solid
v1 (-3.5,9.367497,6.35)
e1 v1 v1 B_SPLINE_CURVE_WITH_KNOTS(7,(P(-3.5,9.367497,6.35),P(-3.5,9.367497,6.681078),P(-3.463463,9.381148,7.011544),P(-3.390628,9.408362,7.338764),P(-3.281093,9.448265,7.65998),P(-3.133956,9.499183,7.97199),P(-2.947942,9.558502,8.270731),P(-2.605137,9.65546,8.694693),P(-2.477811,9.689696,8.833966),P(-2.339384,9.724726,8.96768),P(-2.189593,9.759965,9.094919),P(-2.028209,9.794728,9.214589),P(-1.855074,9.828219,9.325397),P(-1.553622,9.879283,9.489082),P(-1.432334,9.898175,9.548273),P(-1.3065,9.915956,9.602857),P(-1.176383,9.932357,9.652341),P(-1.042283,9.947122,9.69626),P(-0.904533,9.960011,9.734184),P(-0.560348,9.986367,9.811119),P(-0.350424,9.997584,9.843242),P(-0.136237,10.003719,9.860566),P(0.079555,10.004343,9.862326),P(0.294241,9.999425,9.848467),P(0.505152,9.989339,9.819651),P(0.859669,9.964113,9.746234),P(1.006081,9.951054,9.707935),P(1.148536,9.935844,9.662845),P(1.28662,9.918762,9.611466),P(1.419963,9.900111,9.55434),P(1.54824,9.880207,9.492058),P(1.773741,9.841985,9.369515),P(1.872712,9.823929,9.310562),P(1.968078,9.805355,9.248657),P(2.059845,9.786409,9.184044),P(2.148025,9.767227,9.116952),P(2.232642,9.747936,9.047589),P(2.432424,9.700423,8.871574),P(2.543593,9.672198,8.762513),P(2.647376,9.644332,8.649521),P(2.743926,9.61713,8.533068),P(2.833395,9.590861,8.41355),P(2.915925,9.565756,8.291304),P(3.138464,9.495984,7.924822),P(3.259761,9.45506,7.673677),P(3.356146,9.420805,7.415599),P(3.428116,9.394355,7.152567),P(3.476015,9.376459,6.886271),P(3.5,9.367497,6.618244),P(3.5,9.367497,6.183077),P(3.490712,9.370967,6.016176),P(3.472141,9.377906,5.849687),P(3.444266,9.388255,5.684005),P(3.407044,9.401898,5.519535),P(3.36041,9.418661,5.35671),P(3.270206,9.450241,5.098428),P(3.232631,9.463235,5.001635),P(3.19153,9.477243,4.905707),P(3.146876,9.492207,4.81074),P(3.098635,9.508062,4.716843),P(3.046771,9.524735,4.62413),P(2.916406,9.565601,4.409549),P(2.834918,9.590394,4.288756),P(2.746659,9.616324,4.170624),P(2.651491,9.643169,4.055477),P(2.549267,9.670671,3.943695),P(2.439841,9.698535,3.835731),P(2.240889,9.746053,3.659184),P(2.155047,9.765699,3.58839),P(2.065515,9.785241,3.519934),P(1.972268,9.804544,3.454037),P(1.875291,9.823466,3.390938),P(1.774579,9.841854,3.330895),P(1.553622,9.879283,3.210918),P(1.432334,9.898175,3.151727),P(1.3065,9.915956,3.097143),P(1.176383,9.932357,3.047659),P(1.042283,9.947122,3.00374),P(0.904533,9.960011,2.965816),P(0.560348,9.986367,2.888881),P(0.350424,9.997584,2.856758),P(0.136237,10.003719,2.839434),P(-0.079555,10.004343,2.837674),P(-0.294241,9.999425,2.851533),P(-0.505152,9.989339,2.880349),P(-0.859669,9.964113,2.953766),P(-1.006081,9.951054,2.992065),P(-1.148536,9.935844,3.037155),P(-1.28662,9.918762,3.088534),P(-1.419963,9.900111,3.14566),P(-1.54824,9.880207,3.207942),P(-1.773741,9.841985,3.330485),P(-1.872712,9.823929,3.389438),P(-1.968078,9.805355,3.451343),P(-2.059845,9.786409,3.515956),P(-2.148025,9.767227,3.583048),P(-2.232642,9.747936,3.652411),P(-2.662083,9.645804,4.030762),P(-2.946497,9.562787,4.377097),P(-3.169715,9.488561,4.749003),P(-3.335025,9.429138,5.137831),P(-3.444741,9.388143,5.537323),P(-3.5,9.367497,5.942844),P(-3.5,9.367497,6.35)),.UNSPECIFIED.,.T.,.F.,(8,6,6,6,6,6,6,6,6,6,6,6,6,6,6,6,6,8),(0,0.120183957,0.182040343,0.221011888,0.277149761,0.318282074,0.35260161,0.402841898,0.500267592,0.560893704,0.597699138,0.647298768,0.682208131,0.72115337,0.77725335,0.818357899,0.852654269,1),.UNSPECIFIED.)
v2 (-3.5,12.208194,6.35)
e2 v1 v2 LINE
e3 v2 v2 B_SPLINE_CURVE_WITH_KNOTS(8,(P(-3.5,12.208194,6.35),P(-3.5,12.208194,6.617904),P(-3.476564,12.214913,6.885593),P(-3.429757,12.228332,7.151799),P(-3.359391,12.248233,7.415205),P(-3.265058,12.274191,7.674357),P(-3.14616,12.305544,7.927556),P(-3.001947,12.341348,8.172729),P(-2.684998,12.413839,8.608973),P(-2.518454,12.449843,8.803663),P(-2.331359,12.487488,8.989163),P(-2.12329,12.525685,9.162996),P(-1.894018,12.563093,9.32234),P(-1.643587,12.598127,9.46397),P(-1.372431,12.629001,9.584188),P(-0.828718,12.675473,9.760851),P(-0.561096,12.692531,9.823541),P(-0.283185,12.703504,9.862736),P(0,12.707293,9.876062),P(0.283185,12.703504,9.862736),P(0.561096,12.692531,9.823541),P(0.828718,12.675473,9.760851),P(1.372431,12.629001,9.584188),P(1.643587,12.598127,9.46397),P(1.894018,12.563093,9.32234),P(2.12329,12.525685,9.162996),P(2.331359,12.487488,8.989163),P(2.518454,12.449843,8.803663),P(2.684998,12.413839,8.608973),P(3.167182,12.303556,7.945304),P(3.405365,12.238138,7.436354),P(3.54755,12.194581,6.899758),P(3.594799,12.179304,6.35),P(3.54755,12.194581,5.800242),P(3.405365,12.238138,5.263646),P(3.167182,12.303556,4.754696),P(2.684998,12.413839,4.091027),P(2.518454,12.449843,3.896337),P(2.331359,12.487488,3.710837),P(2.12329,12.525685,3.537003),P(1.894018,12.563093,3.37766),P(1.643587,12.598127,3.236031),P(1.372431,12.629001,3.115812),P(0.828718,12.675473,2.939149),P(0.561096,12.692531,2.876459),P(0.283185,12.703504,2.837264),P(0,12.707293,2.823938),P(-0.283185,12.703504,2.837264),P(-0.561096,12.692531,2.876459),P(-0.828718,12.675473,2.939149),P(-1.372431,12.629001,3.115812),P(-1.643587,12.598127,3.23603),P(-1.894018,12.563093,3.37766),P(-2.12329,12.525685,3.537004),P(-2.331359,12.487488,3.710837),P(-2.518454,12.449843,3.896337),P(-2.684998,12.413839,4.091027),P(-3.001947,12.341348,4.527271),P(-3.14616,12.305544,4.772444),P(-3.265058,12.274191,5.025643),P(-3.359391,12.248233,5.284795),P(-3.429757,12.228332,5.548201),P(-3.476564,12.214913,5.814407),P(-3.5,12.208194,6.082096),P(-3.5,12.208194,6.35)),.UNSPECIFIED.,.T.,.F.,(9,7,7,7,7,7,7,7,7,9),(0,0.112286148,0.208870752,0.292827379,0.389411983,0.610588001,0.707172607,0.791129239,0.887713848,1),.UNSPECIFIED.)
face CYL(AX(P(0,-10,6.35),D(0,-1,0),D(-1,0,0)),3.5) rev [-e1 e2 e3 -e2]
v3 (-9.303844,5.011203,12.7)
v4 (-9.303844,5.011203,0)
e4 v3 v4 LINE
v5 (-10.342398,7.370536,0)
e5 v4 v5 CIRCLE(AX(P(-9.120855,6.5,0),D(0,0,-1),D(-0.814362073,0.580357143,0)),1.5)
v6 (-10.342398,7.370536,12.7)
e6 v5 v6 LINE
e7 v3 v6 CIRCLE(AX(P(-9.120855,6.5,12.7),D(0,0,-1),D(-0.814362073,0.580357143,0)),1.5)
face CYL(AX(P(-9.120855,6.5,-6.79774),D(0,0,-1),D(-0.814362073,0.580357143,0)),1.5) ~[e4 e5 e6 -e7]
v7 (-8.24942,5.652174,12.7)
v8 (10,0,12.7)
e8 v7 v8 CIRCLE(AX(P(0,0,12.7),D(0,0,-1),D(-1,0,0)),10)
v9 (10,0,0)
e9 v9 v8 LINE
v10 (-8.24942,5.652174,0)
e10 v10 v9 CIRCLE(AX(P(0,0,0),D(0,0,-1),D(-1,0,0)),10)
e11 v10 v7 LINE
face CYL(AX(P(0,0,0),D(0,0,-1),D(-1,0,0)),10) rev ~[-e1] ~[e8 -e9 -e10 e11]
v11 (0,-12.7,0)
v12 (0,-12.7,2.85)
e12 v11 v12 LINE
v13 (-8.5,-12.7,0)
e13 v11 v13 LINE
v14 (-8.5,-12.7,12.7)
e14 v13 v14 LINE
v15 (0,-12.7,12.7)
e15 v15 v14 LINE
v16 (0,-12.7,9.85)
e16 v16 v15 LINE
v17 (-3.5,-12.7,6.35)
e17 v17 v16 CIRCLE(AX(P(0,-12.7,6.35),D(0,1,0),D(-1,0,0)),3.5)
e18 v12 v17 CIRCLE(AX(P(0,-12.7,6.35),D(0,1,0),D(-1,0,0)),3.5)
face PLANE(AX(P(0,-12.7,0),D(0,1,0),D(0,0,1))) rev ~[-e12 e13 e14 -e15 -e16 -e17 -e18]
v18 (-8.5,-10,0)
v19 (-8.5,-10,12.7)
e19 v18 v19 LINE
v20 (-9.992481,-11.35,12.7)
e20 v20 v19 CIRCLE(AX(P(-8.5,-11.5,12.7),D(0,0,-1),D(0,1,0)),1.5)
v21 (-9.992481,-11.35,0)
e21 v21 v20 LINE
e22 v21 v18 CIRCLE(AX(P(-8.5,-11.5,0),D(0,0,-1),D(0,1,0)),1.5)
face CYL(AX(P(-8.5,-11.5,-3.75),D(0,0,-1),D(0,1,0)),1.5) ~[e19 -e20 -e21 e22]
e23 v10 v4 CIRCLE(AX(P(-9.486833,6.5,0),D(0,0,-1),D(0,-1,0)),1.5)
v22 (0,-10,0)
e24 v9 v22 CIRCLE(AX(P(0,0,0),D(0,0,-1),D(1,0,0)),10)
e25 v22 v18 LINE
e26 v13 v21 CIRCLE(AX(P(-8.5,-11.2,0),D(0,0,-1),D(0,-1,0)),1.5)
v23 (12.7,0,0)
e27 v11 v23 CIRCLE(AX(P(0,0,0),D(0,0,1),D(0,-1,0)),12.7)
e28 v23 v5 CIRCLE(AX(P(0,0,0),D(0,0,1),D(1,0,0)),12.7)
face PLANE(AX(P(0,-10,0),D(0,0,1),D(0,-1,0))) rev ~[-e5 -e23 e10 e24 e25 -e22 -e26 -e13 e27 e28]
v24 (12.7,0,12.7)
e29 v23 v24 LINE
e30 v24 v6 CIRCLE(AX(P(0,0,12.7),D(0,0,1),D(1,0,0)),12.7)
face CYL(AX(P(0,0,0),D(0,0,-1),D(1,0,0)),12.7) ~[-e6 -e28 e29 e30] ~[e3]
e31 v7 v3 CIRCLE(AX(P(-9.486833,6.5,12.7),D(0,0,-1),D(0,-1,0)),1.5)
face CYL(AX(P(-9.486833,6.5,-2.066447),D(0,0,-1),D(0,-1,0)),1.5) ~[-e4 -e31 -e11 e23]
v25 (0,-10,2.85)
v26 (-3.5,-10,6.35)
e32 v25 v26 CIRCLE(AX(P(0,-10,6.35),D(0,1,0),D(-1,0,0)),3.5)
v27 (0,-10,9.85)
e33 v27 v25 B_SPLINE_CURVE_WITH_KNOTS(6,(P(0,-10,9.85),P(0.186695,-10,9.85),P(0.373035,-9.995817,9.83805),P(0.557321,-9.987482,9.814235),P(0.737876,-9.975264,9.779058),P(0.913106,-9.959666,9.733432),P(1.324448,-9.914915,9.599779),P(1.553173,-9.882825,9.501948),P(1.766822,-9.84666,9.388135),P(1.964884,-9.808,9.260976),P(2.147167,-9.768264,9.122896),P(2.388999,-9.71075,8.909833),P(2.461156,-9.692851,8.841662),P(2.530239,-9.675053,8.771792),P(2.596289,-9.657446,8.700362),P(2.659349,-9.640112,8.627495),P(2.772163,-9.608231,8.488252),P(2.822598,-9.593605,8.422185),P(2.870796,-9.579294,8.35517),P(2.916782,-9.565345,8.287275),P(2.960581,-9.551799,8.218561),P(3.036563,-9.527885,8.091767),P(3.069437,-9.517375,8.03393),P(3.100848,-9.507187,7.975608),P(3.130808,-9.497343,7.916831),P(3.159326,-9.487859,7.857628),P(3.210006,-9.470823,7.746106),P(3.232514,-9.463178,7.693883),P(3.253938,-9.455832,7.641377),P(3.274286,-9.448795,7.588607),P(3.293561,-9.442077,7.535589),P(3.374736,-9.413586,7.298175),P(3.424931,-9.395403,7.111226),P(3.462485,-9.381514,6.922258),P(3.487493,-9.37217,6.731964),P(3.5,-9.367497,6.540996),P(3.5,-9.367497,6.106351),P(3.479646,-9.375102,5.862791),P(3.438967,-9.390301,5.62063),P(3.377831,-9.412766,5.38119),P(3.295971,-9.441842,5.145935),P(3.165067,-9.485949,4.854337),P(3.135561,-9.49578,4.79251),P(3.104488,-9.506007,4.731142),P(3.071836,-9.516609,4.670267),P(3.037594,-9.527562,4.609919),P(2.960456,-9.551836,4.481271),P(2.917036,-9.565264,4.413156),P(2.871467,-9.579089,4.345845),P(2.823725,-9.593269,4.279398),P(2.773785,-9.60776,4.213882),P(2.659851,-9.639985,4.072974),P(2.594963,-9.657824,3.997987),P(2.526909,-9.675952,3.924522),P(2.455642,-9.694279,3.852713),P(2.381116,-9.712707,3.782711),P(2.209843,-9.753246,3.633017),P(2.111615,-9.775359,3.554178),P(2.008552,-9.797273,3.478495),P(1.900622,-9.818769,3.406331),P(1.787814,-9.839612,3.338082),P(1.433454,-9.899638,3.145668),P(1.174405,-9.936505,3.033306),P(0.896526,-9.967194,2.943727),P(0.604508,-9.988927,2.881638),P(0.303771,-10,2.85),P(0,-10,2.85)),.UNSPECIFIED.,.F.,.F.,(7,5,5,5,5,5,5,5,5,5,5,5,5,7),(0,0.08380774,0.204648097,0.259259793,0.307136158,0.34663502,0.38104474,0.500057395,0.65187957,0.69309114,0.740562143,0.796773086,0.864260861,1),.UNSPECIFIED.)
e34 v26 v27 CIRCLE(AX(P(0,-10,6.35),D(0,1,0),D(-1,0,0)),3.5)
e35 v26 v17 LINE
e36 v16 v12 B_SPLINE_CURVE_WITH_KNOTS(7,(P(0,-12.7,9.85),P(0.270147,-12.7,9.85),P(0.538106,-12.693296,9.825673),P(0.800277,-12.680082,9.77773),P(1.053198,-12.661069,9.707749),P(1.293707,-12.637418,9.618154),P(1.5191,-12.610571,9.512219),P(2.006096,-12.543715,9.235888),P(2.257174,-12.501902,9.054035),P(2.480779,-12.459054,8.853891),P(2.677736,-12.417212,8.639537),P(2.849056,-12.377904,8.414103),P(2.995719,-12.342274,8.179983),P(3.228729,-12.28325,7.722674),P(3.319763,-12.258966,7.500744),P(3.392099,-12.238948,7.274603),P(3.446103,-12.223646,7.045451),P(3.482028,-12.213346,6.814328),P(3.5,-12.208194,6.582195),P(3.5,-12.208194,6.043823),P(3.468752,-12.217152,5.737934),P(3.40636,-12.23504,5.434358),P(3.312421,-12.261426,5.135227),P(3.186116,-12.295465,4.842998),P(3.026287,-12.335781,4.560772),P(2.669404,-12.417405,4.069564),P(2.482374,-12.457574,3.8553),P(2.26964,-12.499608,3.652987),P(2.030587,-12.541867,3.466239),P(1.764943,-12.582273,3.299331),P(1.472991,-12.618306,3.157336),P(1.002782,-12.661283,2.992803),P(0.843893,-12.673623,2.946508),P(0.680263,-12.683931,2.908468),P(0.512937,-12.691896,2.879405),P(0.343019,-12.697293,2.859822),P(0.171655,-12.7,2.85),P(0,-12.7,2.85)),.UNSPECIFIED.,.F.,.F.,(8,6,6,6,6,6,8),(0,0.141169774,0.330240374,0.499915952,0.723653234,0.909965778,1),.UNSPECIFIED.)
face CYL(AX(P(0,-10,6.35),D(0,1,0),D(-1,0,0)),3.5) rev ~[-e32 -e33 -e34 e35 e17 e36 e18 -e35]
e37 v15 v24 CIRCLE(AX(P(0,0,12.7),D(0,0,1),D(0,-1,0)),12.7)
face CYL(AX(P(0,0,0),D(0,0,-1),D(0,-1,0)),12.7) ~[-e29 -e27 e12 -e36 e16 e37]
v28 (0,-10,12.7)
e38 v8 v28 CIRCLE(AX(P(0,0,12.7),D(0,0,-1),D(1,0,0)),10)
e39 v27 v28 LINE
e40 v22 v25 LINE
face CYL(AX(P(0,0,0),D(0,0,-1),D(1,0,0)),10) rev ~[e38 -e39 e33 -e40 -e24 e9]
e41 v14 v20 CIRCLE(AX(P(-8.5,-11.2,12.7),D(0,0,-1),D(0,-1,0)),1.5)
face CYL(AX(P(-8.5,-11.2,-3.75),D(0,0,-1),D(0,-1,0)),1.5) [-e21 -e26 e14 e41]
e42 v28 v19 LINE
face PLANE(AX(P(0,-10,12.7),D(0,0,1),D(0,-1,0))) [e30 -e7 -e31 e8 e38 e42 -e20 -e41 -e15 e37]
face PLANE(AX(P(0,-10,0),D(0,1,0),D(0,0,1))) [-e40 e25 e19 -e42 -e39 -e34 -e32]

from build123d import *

# Parameters (mm, degrees)
F1_DEPTH      = 12.7
F2_W          = 2.7
F2_H          = 12.7
F3_DEPTH      = 10
F4_R          = 3.5
F5_DEPTH      = 2.701
F5_DEPTH_BACK = 22.701
F6_T1_DEPTH   = 20.2
F7_W          = 8.7146805599
F7_H          = 16.2741800305
F8_DEPTH      = 5
F9_T1_DEPTH   = 16.8328947133
F9_T3_DEPTH   = 26.2954806011


# Not quite as in the source:
# - a fillet or chamfer that OpenCascade refuses, or shapes differently, is made with other operations: its cross-section is extruded or revolved along the edge and cut away or added


with BuildPart() as f1:
    # F0 (on Top) → F1 (new body)
    with BuildSketch(Plane.XY):
        with BuildLine():
            ThreePointArc((0, -12.7), (8.9802561211, -8.9802561211), (12.7, 0))
            ThreePointArc((12.7, 0), (0, 12.7), (-12.7, 0))
            Line((-12.7, 0), (-10, 0))
            ThreePointArc((-10, 0), (0, 10), (10, 0))
            ThreePointArc((10, 0), (7.0710678119, -7.0710678119), (0, -10))
            Line((0, -10), (0, -12.7))
        make_face()
    extrude(amount=F1_DEPTH)

    # F2 (on face) → F3 (join)
    with BuildSketch(Plane(origin=(0, 0, 0), x_dir=(0, -1, 0), z_dir=(-1, 0, 0))):
        with Locations((11.35, 6.35)):
            Rectangle(F2_W, F2_H)
    extrude(amount=F3_DEPTH)

    # F4 (on face) → F5 (cut, two sides)
    with BuildSketch(Plane(origin=(0, -10, 0), x_dir=(-1, 0, 0), z_dir=(0, 1, 0))) as f5_sk:
        with Locations((0, 6.35)):
            Circle(F4_R)
    extrude(amount=-F5_DEPTH, mode=Mode.SUBTRACT)
    extrude(f5_sk.sketch, amount=F5_DEPTH_BACK, mode=Mode.SUBTRACT)

    # F6: fillet of radius 1.5 on 2 edges, made by hand

    # F6_s2 → F6_t1 (cut)
    with BuildSketch(Plane.XY.offset(-3.75)):
        with BuildLine():
            ThreePointArc((-8.5, -10), (-9.5606601718, -10.4393398282), (-10, -11.5))
            Line((-10, -11.5), (-10, -10))
            Line((-10, -10), (-8.5, -10))
        make_face()
        with BuildLine():
            ThreePointArc((-8.5, -12.7), (-9.5606601718, -12.2606601718), (-10, -11.2))
            Line((-10, -11.2), (-10, -12.7))
            Line((-10, -12.7), (-8.5, -12.7))
        make_face()
    extrude(amount=F6_T1_DEPTH, mode=Mode.SUBTRACT)

    # F7 (on face) → F8 (cut)
    with BuildSketch(Plane.XZ):
        with Locations((-12.651483994, 6.0685008066)):
            Rectangle(F7_W, F7_H)
    extrude(amount=-F8_DEPTH, mode=Mode.SUBTRACT)

    # F9: fillet of radius 1.5 on 2 edges, made by hand

    # F9_s2 → F9_t1 (cut)
    with BuildSketch(Plane.XY.offset(-2.0664473567)):
        with BuildLine():
            ThreePointArc((-9.4868329805, 5), (-8.7874543743, 5.1730223946), (-8.249419983, 5.652173913))
            ThreePointArc((-8.249419983, 5.652173913), (-8.4611229501, 5.3300467562), (-8.6602540378, 5))
            Line((-8.6602540378, 5), (-9.4868329805, 5))
        make_face()
    extrude(amount=F9_T1_DEPTH, mode=Mode.SUBTRACT)

    # F9_s4 → F9_t3 (cut)
    with BuildSketch(Plane.XY.offset(-6.7977403006)):
        with BuildLine():
            ThreePointArc((-10.3423983333, 7.3705357143), (-10.4542350586, 5.812905964), (-9.1208552231, 5))
            Line((-9.1208552231, 5), (-11.6743308159, 5))
            ThreePointArc((-11.6743308159, 5), (-11.0719894554, 6.2210167577), (-10.3423983333, 7.3705357143))
        make_face()
    extrude(amount=F9_T3_DEPTH, mode=Mode.SUBTRACT)


solid = f1.part
